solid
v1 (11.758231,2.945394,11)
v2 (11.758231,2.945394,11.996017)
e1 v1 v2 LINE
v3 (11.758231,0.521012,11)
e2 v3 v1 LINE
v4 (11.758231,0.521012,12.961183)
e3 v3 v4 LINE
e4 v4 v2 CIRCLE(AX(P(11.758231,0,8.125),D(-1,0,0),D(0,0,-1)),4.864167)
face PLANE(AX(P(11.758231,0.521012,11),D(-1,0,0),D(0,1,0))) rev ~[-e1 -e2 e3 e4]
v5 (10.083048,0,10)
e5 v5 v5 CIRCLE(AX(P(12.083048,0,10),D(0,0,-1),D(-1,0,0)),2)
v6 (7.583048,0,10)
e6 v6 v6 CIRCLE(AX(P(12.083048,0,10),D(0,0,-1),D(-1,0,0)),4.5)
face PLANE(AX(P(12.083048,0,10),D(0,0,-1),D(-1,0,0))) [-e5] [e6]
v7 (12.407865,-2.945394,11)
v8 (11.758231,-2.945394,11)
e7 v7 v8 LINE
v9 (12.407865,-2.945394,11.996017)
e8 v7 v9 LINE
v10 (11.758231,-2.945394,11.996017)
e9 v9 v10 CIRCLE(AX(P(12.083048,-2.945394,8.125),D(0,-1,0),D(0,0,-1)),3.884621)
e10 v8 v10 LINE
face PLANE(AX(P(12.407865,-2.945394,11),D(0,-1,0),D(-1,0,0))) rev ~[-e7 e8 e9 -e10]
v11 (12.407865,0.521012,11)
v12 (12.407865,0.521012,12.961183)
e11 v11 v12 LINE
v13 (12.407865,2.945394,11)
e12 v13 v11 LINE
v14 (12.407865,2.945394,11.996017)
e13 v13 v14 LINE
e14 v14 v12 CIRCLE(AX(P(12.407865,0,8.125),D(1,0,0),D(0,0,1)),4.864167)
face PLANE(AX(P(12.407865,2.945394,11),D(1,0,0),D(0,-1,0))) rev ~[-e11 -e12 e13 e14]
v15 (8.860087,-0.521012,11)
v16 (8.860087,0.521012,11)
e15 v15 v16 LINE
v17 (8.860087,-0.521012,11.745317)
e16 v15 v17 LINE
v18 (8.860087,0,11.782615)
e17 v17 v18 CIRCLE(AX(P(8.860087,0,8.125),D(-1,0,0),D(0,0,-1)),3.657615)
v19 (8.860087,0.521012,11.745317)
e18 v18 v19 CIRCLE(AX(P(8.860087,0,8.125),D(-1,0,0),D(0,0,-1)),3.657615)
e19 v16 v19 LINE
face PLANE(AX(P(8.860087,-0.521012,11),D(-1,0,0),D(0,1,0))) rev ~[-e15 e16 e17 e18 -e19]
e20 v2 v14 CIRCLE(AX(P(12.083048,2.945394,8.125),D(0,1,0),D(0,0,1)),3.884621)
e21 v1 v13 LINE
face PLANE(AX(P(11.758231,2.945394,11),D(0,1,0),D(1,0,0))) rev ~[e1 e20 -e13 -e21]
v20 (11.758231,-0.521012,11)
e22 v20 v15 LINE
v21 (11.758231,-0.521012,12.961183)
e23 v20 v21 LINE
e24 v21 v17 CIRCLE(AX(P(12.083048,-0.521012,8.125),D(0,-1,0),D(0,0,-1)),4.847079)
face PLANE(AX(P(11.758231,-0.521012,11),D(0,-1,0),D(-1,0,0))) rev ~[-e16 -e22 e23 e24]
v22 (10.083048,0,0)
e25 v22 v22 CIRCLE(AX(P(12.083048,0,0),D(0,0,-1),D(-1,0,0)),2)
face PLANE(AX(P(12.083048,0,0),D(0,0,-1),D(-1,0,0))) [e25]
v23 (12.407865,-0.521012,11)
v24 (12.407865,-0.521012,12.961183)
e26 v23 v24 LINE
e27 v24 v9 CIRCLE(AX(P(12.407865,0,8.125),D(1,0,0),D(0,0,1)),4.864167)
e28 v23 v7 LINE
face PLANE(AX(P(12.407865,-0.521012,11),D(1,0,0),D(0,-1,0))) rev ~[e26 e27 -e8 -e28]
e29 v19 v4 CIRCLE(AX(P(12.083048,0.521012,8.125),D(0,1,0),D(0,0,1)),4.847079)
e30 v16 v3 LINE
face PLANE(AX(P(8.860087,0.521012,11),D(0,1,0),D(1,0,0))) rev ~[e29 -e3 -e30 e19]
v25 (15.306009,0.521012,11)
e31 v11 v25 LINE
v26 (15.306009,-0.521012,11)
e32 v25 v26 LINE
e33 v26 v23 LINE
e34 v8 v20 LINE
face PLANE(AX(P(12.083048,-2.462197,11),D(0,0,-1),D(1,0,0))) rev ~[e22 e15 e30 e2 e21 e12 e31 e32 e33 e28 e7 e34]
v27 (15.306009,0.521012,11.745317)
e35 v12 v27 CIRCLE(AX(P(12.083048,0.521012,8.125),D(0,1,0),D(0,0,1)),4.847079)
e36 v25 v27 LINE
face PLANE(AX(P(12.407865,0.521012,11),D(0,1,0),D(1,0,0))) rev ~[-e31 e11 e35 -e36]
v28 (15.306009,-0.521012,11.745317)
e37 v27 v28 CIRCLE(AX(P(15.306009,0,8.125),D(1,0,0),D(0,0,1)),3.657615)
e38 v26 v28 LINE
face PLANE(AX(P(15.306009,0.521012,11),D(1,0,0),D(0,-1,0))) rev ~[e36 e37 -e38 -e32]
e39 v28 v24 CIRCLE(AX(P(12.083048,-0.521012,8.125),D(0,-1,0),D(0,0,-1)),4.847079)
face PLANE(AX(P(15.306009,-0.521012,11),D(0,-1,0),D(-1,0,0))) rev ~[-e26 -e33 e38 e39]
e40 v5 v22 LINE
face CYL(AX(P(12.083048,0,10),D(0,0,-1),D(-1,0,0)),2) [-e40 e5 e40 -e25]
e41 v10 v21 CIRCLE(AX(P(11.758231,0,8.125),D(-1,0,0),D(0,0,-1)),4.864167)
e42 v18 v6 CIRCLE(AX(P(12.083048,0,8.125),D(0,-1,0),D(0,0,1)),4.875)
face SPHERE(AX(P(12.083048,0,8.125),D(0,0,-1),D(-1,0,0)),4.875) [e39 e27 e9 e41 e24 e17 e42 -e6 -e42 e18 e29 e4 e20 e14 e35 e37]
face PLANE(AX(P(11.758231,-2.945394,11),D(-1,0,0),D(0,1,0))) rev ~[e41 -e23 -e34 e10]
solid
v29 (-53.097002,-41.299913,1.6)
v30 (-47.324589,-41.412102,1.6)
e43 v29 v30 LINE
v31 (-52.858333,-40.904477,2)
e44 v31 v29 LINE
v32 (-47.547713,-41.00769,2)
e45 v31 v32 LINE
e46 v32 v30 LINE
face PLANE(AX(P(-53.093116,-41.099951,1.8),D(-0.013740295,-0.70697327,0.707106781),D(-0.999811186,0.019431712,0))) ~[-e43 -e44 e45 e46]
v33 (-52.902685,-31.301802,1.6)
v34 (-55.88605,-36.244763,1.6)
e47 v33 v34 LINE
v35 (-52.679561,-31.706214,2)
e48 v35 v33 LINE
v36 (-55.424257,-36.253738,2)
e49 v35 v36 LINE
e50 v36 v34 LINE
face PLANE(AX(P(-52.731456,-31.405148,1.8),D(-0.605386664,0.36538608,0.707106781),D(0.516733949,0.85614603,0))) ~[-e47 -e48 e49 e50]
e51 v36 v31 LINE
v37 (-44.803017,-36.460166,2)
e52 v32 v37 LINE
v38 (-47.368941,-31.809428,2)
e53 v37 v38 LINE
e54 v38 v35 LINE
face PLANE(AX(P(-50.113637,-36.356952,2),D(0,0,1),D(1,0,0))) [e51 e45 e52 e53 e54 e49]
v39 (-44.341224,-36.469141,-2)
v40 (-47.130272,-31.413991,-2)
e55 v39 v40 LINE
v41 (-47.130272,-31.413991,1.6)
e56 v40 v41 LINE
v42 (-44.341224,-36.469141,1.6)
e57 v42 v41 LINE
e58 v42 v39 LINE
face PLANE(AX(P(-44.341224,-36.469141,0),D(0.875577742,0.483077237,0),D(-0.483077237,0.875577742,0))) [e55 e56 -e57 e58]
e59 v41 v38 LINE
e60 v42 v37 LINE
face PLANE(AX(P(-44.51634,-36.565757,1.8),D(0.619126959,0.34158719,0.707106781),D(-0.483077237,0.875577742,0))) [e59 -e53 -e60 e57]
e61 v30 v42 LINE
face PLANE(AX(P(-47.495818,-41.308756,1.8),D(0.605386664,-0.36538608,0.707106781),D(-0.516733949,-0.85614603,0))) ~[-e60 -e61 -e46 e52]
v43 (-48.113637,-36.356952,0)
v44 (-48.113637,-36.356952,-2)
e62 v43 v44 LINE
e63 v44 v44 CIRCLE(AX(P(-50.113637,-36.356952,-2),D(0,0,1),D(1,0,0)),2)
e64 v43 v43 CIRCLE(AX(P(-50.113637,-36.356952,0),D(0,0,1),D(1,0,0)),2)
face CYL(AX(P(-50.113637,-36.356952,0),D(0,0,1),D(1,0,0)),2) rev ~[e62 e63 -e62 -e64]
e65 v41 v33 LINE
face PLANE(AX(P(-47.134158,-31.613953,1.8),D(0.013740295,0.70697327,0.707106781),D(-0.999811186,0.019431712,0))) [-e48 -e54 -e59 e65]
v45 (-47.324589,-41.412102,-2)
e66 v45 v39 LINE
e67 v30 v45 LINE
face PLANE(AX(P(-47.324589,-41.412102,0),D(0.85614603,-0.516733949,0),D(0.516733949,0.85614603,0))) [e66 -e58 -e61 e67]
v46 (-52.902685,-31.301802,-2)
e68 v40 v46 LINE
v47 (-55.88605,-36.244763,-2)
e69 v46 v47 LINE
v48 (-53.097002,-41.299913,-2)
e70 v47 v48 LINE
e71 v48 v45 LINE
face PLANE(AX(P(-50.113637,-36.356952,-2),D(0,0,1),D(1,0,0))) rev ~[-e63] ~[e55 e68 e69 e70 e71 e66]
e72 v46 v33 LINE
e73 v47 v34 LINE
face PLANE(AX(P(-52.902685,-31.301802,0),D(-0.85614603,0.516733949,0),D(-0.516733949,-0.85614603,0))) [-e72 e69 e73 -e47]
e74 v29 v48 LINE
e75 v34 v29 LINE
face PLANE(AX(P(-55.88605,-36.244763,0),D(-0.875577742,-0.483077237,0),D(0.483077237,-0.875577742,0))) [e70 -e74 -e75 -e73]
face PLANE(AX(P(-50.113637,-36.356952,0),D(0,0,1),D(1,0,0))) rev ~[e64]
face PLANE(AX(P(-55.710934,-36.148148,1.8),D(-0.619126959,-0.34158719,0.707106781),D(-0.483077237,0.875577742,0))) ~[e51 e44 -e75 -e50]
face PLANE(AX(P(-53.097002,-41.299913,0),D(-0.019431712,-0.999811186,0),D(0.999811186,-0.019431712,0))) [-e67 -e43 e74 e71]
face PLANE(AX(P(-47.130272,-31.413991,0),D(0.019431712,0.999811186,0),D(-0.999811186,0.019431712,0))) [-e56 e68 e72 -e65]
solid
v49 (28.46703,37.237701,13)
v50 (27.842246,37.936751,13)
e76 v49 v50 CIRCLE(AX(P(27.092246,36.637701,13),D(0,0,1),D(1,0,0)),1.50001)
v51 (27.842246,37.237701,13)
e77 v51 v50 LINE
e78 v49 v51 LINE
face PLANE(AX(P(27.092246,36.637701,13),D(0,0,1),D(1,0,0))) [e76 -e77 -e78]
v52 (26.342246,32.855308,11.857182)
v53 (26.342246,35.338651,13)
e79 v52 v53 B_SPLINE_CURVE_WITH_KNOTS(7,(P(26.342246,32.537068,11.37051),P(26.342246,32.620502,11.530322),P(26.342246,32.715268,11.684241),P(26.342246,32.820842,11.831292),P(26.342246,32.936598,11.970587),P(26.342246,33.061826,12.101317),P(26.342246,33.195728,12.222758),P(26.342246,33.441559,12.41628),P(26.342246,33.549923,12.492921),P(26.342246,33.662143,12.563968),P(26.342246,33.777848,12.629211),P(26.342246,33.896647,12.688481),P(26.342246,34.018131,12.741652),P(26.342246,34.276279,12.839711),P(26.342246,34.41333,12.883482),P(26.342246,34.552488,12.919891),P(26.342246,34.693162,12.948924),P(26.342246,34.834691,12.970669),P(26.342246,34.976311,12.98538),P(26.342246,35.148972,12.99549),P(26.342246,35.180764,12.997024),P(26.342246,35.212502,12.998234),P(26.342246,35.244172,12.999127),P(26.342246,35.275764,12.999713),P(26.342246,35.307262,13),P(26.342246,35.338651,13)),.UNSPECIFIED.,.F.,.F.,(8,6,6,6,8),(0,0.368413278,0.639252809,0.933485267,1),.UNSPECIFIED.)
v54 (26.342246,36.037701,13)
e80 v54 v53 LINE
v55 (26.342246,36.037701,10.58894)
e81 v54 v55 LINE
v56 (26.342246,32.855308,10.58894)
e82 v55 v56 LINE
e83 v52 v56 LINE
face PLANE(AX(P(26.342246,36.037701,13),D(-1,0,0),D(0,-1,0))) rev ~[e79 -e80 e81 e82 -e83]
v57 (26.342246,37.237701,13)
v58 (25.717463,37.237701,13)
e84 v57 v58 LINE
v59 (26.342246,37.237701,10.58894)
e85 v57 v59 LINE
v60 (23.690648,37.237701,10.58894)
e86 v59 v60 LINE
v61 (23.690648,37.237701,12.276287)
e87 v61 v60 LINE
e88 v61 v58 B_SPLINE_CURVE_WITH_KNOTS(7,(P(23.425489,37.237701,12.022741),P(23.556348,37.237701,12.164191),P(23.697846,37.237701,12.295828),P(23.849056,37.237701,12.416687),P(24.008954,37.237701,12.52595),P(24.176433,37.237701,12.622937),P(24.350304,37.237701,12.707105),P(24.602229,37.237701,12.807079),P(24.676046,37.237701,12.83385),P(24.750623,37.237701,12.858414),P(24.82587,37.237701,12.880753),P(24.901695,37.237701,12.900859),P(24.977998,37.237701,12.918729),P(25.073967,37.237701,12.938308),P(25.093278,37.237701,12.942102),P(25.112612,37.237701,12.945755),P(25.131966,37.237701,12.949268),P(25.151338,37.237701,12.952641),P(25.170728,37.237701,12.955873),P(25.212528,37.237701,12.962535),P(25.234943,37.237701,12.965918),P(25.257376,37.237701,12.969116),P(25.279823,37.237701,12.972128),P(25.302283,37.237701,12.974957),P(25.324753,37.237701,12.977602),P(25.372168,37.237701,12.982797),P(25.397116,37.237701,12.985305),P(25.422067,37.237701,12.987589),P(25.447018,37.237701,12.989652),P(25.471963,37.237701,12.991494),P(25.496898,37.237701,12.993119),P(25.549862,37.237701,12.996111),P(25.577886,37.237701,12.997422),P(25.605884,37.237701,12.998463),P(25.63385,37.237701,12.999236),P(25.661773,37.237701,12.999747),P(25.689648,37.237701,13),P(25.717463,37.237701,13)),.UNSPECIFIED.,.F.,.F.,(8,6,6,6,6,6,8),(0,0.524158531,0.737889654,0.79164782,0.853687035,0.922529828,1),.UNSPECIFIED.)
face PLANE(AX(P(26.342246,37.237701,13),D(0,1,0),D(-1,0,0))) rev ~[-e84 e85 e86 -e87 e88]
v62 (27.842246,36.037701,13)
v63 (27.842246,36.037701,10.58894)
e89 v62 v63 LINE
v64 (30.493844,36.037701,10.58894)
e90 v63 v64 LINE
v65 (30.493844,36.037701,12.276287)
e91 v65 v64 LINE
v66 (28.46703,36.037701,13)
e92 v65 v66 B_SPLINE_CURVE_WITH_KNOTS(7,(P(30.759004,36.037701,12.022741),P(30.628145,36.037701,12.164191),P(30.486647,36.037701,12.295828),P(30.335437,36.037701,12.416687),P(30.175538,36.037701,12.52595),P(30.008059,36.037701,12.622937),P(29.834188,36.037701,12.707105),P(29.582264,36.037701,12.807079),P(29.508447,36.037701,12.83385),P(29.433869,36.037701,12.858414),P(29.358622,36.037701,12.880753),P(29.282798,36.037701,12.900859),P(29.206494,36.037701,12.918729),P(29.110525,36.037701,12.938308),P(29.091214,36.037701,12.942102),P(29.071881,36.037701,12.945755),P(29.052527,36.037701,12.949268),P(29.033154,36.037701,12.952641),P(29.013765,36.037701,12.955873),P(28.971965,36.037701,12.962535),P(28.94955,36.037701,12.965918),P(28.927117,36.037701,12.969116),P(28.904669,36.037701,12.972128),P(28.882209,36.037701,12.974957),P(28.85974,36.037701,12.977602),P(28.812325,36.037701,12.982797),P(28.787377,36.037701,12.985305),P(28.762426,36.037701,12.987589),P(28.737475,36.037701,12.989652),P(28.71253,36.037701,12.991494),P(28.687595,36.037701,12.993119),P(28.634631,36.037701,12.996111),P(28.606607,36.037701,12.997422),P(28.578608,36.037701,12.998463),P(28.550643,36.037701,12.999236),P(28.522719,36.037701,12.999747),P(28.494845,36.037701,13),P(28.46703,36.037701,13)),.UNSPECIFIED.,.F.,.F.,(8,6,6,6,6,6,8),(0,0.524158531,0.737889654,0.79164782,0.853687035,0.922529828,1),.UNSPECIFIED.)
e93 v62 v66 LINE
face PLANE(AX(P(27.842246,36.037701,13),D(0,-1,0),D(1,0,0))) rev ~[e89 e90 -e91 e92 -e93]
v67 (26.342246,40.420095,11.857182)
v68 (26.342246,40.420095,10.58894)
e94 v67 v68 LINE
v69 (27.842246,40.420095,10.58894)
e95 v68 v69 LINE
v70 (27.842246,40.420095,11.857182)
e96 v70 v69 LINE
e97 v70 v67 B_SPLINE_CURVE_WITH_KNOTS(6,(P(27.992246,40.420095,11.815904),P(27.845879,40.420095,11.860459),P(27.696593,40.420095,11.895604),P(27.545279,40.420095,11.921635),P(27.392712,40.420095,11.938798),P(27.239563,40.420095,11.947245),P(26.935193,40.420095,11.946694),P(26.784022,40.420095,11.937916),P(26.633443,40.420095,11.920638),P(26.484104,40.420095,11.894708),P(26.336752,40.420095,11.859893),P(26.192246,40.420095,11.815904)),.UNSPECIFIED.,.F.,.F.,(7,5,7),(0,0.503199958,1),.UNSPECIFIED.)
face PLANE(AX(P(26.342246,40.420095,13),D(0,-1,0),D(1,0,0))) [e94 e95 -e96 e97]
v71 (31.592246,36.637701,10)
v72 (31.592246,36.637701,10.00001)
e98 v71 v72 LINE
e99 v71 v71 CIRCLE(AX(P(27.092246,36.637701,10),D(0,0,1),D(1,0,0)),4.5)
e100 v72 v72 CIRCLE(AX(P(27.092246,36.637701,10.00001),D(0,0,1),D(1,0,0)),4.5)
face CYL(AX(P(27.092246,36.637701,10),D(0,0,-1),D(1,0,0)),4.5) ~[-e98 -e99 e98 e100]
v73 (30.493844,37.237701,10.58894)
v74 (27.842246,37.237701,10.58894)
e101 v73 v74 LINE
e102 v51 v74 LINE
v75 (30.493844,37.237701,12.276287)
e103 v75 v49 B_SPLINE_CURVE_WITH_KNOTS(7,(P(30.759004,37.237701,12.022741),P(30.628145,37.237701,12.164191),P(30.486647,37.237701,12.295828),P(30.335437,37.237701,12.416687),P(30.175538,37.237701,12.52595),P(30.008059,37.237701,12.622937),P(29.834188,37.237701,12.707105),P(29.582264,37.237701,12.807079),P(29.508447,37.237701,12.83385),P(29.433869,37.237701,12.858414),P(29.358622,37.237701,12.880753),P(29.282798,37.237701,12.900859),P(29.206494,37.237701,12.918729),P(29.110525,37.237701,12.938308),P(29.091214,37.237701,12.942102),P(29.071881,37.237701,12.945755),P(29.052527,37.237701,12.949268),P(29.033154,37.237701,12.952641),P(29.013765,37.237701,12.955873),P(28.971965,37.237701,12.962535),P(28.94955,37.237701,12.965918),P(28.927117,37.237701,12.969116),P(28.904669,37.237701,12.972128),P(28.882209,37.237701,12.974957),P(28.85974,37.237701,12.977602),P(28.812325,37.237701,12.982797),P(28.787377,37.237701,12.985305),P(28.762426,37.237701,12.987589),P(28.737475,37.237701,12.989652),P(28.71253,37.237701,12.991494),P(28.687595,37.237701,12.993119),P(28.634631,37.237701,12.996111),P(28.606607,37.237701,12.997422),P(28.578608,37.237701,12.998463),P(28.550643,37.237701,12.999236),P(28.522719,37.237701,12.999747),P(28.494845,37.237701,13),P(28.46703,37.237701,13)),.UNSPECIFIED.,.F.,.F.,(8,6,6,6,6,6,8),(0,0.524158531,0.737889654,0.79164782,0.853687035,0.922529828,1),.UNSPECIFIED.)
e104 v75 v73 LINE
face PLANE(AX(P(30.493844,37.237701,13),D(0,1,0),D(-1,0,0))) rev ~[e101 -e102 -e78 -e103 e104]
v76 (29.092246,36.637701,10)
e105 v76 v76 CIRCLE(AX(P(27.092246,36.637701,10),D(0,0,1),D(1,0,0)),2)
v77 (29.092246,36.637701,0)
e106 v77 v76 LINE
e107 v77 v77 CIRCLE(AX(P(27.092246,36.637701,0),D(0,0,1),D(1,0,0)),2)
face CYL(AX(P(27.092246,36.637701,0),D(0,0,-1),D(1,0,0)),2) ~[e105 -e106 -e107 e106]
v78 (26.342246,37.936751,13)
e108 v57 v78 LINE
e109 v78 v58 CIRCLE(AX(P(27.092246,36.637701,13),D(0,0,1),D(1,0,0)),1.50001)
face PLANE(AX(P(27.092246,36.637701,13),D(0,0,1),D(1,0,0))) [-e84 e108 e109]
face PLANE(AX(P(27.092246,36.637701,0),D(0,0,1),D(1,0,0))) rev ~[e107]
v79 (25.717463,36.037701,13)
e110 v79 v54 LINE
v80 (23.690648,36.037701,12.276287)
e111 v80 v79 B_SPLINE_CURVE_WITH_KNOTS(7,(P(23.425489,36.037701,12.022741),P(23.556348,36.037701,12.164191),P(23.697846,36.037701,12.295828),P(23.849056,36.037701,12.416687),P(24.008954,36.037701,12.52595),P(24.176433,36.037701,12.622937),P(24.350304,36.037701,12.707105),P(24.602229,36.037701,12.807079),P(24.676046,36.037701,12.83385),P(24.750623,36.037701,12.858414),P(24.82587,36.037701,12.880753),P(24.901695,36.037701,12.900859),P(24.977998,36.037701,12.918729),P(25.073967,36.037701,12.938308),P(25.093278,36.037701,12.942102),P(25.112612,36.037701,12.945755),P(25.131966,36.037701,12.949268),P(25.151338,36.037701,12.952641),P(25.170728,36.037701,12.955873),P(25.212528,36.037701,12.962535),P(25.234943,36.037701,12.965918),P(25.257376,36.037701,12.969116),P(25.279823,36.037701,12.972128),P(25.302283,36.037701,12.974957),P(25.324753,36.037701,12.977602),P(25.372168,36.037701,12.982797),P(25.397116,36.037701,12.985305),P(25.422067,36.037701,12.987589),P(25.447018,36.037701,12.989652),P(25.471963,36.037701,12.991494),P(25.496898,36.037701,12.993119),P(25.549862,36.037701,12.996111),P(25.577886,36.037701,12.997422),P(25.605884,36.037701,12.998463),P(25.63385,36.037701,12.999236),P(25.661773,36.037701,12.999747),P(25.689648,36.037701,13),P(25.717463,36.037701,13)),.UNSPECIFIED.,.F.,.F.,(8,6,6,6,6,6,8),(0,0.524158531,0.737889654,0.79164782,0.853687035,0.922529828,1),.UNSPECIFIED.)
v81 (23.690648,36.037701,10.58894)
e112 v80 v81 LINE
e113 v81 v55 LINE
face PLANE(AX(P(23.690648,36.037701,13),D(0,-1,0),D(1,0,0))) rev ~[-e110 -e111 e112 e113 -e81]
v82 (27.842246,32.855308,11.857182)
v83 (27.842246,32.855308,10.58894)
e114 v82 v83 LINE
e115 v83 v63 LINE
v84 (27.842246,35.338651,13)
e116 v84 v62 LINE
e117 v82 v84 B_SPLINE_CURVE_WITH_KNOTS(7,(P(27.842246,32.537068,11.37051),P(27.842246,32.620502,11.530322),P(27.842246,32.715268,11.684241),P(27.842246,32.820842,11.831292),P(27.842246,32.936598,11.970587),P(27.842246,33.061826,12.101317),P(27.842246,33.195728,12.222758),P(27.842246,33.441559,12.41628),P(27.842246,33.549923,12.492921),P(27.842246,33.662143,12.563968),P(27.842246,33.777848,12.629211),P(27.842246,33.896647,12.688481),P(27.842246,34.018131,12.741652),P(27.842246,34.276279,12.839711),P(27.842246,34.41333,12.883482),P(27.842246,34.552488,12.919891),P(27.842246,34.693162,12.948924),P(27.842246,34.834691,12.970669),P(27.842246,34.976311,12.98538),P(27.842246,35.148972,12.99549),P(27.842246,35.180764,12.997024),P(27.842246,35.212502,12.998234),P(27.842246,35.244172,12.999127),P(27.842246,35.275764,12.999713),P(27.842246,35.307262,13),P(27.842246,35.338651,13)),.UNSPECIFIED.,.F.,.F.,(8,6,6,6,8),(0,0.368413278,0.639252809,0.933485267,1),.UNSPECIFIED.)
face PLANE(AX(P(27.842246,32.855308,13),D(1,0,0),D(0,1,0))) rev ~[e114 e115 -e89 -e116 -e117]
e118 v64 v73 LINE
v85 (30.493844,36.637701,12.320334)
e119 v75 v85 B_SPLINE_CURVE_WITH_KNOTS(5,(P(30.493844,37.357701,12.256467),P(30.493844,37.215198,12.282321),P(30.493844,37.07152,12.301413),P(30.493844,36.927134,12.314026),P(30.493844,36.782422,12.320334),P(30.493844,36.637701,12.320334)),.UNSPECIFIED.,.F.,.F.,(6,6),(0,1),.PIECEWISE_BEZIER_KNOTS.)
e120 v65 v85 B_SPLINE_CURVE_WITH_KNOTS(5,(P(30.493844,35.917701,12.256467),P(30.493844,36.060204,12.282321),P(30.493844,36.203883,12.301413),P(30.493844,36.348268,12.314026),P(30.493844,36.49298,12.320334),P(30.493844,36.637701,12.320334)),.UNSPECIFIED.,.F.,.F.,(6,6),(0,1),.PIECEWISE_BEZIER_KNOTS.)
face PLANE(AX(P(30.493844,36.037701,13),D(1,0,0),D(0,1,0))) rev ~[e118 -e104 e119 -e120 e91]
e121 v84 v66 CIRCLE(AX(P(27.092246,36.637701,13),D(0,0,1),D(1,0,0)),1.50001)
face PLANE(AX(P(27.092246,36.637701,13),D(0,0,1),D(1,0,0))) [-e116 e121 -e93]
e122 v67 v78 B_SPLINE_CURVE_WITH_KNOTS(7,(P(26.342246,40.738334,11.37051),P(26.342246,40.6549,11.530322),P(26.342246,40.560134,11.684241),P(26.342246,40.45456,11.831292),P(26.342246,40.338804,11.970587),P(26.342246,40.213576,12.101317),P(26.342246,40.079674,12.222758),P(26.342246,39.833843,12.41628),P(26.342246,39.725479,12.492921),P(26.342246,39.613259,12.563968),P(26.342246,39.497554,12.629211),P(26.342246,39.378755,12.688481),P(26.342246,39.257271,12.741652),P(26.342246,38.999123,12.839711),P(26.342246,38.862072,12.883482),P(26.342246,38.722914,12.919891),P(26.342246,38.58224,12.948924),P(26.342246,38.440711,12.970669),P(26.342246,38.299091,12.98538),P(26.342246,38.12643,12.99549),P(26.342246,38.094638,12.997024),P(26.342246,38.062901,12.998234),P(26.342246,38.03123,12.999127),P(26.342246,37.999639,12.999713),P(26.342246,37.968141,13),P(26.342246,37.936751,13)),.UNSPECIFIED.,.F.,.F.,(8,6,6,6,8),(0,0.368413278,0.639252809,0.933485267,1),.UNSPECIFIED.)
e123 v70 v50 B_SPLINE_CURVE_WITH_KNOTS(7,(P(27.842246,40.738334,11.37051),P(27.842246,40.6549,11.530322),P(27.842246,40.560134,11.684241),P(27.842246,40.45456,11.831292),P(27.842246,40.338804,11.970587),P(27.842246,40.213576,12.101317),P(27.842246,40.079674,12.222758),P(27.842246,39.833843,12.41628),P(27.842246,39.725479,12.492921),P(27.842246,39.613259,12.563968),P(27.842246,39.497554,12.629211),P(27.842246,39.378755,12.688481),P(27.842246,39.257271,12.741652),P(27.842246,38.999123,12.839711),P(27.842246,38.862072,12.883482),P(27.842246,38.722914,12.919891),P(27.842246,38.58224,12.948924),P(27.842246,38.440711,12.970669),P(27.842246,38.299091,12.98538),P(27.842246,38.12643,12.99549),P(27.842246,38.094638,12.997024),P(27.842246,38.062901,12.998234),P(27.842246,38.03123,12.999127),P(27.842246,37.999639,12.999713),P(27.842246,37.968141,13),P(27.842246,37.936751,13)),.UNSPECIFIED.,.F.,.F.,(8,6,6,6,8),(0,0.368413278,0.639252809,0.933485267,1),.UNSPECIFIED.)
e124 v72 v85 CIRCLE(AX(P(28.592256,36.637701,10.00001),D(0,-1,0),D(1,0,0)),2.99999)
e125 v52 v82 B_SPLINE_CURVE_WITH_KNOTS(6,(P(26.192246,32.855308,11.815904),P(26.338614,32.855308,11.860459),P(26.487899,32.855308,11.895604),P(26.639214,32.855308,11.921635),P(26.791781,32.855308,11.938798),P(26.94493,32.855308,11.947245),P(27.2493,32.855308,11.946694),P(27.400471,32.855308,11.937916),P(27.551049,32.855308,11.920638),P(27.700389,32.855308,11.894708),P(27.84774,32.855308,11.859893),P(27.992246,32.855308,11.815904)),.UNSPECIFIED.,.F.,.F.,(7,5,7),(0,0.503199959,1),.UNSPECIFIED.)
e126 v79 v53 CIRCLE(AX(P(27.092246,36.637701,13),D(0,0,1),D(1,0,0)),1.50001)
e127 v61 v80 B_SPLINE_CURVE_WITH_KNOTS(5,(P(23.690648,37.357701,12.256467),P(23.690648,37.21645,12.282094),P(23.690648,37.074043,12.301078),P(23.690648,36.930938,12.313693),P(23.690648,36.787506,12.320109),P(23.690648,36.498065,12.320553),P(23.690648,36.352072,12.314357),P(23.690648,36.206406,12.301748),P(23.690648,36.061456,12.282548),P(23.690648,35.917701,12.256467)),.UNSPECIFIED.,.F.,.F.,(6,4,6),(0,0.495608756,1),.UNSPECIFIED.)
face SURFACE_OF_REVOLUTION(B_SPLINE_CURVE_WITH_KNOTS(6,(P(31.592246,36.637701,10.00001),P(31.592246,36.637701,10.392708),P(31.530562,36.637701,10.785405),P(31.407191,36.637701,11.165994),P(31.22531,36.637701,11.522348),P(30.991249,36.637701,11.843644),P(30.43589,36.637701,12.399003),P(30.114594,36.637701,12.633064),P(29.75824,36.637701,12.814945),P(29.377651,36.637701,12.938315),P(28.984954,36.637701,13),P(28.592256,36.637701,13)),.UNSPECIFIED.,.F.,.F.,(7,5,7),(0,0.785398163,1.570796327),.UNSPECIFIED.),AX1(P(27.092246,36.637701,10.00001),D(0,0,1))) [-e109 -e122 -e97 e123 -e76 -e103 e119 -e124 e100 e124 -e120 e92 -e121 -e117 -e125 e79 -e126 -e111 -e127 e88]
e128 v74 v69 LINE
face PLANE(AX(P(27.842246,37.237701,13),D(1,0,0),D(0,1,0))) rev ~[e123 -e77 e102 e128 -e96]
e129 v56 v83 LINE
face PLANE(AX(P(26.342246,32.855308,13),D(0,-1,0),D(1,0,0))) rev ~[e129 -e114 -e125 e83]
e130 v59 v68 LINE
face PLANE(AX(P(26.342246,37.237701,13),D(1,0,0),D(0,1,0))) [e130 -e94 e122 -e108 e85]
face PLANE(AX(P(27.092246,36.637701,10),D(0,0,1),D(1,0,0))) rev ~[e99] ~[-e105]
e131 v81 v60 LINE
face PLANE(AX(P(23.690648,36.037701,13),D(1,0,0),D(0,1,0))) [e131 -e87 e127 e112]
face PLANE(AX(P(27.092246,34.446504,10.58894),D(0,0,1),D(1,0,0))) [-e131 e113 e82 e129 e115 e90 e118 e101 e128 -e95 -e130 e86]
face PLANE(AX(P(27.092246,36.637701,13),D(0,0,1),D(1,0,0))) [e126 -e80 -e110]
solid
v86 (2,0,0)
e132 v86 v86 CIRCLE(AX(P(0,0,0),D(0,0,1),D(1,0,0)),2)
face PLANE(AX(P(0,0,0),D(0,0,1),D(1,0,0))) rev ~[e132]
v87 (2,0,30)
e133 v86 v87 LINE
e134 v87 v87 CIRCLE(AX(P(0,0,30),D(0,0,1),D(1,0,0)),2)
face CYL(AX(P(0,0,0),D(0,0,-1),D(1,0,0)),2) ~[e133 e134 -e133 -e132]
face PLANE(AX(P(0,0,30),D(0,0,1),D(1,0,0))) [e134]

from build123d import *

# Parameters (mm, degrees)
F0_R      = 2
F1_DEPTH  = 30
F3_DEPTH  = 2
F6_R      = 2
F7_DEPTH  = 25
F8_R      = 2
F9_DEPTH  = 10
F10_R     = 4.5
F11_DEPTH = 3
F12_R     = 2.99999
F13_W     = 1.5
F13_H     = 3.1823935074
F13_H_2   = 1.2
F13_W_2   = 2.6515979143
F14_DEPTH = 2.41106
F15_SIZE  = 0.4
F19_START = -1
F19_DEPTH = 19.001


# Not quite as in the source:
# - a fillet or chamfer is up to 0.001 mm smaller than in the source, because OpenCascade refuses the exact size
# - the program builds the solid bodies; features that only make, move or delete a surface that nothing else refers to are left out


with BuildPart() as f1:
    # F0 (on Top) → F1 (new body)
    with BuildSketch(Plane.XY):
        Circle(F0_R)
    extrude(amount=F1_DEPTH)


with BuildPart() as f3:
    # F2 (on Top) → F3 (new body, symmetric)
    with BuildSketch(Plane.XY):
        Polygon((-44.3412244239, -36.4691410829), (-47.1302721521, -31.4139906298), (-52.9026847286, -31.3018015883), (-55.8860495767, -36.2447629999), (-53.0970018485, -41.2999134529), (-47.3245892721, -41.4121024944), align=None)
    extrude(amount=F3_DEPTH, both=True)

    # F6 (on face) → F7 (cut)
    with BuildSketch(Plane.XY):
        with Locations((-50.1136370003, -36.3569520414)):
            Circle(F6_R)
    extrude(amount=-F7_DEPTH, mode=Mode.SUBTRACT)

    # F15
    f15_edges = [f3.edges().sort_by_distance(p)[0] for p in [
        (-54.394367, -33.773282, 2),
        (-50.016478, -31.357896, 2),
        (-45.735748, -33.941566, 2),
        (-54.491526, -38.772338, 2),
        (-50.210796, -41.356008, 2),
        (-45.832907, -38.940622, 2),
    ]]
    chamfer(f15_edges, length=F15_SIZE)


with BuildPart() as f9:
    # F8 (on Top) → F9 (new body)
    with BuildSketch(Plane.XY):
        with Locations((27.0922463387, 36.6377010942)):
            Circle(F8_R)
    extrude(amount=F9_DEPTH)

    # F10 (on face) → F11 (join)
    with BuildSketch(Plane.XY.offset(10)):
        with Locations((27.0922463387, 36.6377010942)):
            Circle(F10_R)
    extrude(amount=F11_DEPTH)

    # F12 (radius 3 in the source; OpenCascade refuses exactly that, so slightly less here)
    f12_edges = [f9.edges().sort_by_distance(p)[0] for p in [
        (22.592246, 36.637701, 13),
    ]]
    fillet(f12_edges, radius=F12_R)

    # F13 (on face) → F14 (cut)
    with BuildSketch(Plane.XY.offset(13)):
        with Locations((27.0922463387, 34.4465043404)):
            Rectangle(F13_W, F13_H)
        with Locations((27.0922463387, 36.6377010942)):
            Rectangle(F13_W, F13_H_2)
        with Locations((29.1680452959, 36.6377010942)):
            Rectangle(F13_W_2, F13_H_2)
        with Locations((25.0164473816, 36.6377010942)):
            Rectangle(F13_W_2, F13_H_2)
        with Locations((27.0922463387, 38.8288978479)):
            Rectangle(F13_W, F13_H)
    extrude(amount=-F14_DEPTH, mode=Mode.SUBTRACT)


with BuildPart() as f17:
    # F16 (on Front) → F17 (revolve)
    with BuildSketch(Plane.XZ):
        with BuildLine():
            Line((10.083048013, 0), (12.083048013, 0))
            Line((12.083048013, 0), (12.083048013, 13))
            ThreePointArc((12.083048013, 13), (9.3788845564, 12.1812451849), (7.583048013, 10))
            Line((7.583048013, 10), (10.083048013, 10))
            Line((10.083048013, 10), (10.083048013, 0))
        make_face()
    revolve(axis=Axis((12.083048013, 0, 5.7094343938), (0, 0, -1)))

    # F18 (on face) → F19 (cut)
    with BuildSketch(Plane(origin=(0, 0, 10), x_dir=(1, 0, 0), z_dir=(0, 0, -1)).offset(F19_START)):
        with BuildLine():
            Line((12.4078653753, 1.9734471569), (12.4078653753, 2.9453942552))
            Line((12.4078653753, 2.9453942552), (11.7582306508, 2.9453942552))
            Line((11.7582306508, 2.9453942552), (11.7582306508, 1.9734471569))
            ThreePointArc((11.7582306508, 1.9734471569), (12.083048013, 2), (12.4078653753, 1.9734471569))
        make_face()
        with BuildLine():
            ThreePointArc((12.4078653753, -1.9734471569), (12.083048013, -2), (11.7582306508, -1.9734471569))
            Line((11.7582306508, -1.9734471569), (11.7582306508, -2.9453942552))
            Line((11.7582306508, -2.9453942552), (12.4078653753, -2.9453942552))
            Line((12.4078653753, -2.9453942552), (12.4078653753, -1.9734471569))
        make_face()
        with BuildLine():
            Line((15.3060089797, 0.5210122326), (14.0139924072, 0.5210122326))
            ThreePointArc((14.0139924072, 0.5210122326), (14.0657089508, 0.2627843333), (14.083048013, 0))
            ThreePointArc((14.083048013, 0), (14.0657089508, -0.2627843333), (14.0139924072, -0.5210122326))
            Line((14.0139924072, -0.5210122326), (15.3060089797, -0.5210122326))
            Line((15.3060089797, -0.5210122326), (15.3060089797, 0.5210122326))
        make_face()
        with BuildLine():
            ThreePointArc((10.1521036188, -0.5210122326), (10.083048013, 0), (10.1521036188, 0.5210122326))
            Line((10.1521036188, 0.5210122326), (8.8600870464, 0.5210122326))
            Line((8.8600870464, 0.5210122326), (8.8600870464, -0.5210122326))
            Line((8.8600870464, -0.5210122326), (10.1521036188, -0.5210122326))
        make_face()
        with BuildLine():
            Line((12.4078653753, 0.5210122326), (12.4078653753, 1.9734471569))
            ThreePointArc((12.4078653753, 1.9734471569), (12.083048013, 2), (11.7582306508, 1.9734471569))
            Line((11.7582306508, 1.9734471569), (11.7582306508, 0.5210122326))
            Line((11.7582306508, 0.5210122326), (10.1521036188, 0.5210122326))
            ThreePointArc((10.1521036188, 0.5210122326), (10.083048013, 0), (10.1521036188, -0.5210122326))
            Line((10.1521036188, -0.5210122326), (11.7582306508, -0.5210122326))
            Line((11.7582306508, -0.5210122326), (11.7582306508, -1.9734471569))
            ThreePointArc((11.7582306508, -1.9734471569), (12.083048013, -2), (12.4078653753, -1.9734471569))
            Line((12.4078653753, -1.9734471569), (12.4078653753, -0.5210122326))
            Line((12.4078653753, -0.5210122326), (14.0139924072, -0.5210122326))
            ThreePointArc((14.0139924072, -0.5210122326), (14.0657089508, -0.2627843333), (14.083048013, 0))
            ThreePointArc((14.083048013, 0), (14.0657089508, 0.2627843333), (14.0139924072, 0.5210122326))
            Line((14.0139924072, 0.5210122326), (12.4078653753, 0.5210122326))
        make_face()
    extrude(amount=-F19_DEPTH, mode=Mode.SUBTRACT)


solid = Compound([f1.part, f3.part, f9.part, f17.part])
